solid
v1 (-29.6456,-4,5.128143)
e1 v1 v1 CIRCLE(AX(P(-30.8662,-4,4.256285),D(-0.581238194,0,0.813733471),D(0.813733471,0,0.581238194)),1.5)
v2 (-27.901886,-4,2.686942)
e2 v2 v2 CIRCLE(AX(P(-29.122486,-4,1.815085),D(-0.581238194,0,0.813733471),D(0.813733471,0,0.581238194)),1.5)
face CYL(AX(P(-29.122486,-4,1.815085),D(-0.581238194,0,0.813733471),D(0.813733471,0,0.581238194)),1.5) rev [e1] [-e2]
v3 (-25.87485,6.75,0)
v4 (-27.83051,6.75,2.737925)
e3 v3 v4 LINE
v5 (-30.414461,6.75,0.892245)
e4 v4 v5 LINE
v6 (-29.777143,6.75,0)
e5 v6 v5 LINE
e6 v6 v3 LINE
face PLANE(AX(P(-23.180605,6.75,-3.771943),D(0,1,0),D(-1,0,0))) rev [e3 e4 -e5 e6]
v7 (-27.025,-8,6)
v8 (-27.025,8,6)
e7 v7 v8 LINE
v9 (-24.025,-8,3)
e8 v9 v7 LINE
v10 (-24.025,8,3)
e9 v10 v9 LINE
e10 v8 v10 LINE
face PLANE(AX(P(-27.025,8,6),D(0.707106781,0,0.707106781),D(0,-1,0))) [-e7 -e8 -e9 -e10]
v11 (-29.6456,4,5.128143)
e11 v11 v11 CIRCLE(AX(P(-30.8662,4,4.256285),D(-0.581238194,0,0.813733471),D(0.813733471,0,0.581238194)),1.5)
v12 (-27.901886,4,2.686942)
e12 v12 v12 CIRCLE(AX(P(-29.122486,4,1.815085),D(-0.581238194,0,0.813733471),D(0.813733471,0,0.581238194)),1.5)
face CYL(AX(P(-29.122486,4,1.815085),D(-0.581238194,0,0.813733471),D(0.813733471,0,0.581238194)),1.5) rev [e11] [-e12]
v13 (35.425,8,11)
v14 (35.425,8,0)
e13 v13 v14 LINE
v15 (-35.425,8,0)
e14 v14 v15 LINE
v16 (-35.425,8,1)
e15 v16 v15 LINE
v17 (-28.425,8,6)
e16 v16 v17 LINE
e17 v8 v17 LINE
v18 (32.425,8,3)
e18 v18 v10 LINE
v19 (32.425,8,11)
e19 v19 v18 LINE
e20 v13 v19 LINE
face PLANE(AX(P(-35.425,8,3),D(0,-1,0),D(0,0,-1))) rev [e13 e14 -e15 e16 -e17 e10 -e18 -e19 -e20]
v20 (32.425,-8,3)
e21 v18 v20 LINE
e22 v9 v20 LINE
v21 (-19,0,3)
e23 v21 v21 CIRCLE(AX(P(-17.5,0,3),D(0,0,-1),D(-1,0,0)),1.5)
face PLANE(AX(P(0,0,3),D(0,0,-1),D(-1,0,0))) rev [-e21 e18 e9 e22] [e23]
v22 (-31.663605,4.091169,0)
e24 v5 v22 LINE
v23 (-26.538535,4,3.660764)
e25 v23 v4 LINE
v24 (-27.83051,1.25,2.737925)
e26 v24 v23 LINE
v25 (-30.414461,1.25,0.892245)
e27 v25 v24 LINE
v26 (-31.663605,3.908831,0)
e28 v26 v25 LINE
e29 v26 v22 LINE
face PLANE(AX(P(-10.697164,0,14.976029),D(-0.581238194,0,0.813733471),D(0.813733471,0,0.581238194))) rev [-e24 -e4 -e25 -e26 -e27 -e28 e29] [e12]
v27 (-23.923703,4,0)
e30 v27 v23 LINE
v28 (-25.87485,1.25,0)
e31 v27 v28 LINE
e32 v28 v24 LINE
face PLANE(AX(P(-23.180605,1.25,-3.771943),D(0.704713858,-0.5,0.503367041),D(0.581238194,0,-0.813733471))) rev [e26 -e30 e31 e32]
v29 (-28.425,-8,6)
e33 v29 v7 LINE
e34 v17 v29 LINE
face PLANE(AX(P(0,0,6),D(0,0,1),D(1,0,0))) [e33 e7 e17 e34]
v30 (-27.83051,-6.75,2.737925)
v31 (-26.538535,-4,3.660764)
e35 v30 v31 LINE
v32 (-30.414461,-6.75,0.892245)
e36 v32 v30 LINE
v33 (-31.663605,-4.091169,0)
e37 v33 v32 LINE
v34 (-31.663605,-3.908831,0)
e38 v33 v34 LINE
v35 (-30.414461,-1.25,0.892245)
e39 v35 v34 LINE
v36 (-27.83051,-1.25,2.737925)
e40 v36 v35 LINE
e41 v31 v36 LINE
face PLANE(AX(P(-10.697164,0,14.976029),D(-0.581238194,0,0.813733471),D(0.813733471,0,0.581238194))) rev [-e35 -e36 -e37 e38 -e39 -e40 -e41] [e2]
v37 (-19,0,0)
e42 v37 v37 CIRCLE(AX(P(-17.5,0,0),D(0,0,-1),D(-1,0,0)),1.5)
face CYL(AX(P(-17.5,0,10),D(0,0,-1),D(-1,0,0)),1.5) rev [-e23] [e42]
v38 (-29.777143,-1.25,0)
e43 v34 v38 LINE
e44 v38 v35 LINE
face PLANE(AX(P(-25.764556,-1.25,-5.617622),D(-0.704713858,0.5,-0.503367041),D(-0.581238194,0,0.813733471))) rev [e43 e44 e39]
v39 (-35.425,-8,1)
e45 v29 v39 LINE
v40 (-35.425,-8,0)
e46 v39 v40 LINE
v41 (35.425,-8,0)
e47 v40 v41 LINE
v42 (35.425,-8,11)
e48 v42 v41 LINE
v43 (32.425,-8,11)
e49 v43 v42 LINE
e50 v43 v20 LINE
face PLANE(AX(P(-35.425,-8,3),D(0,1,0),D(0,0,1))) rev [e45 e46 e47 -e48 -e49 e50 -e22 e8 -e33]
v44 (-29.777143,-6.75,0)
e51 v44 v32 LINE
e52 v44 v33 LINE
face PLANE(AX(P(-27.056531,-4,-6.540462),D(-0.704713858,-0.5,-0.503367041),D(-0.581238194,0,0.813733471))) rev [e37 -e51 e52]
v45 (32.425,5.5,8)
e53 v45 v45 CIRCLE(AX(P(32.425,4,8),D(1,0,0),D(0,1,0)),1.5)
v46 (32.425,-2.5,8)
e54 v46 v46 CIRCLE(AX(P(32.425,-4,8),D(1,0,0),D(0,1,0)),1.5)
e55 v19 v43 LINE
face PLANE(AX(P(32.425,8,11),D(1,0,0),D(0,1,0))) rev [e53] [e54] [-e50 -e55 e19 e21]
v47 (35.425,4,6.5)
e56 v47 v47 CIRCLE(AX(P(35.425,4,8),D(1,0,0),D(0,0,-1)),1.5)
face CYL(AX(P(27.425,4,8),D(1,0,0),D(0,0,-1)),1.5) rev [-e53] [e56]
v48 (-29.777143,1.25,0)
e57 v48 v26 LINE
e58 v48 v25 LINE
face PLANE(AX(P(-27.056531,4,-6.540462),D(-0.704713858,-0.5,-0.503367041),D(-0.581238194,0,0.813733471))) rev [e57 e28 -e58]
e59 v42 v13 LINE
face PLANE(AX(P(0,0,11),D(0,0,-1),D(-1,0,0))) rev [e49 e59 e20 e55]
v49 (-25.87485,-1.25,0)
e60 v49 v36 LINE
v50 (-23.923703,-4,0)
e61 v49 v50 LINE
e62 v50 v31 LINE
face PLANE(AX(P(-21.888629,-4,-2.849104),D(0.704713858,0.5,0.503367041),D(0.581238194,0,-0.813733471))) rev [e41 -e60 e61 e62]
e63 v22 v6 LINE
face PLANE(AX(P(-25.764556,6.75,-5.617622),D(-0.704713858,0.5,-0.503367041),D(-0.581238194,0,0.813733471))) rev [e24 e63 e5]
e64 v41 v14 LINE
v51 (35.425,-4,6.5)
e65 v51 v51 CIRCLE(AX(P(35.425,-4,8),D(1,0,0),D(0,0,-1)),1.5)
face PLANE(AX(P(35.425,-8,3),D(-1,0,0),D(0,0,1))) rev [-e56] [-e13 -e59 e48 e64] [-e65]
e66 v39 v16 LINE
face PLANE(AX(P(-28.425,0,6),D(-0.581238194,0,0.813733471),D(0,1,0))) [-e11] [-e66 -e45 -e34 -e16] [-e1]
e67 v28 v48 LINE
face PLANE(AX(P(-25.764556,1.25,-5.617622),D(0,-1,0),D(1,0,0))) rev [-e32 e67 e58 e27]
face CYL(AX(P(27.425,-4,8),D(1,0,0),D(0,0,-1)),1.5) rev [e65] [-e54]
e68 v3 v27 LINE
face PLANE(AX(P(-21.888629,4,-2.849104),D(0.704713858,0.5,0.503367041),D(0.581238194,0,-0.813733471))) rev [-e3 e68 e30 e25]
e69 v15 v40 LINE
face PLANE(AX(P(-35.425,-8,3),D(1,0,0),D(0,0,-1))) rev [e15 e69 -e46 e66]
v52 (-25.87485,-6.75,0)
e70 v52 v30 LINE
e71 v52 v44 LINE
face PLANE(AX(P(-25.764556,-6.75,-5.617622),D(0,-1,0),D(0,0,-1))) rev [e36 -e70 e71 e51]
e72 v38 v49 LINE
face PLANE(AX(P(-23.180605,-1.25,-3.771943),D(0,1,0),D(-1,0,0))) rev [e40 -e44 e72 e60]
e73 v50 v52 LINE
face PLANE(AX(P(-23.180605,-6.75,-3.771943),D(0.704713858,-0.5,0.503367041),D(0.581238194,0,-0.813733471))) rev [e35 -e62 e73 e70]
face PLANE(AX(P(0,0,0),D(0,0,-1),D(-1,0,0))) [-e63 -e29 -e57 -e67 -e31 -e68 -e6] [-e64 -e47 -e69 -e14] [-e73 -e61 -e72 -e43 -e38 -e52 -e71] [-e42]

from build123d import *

# Parameters (mm, degrees)
SKETCH1_W           = 70.85
SKETCH1_H           = 16
BOSS_EXTRUDE1_DEPTH = 3
SKETCH2_W           = 8.4
SKETCH2_H           = 16
BOSS_EXTRUDE2_DEPTH = 3
CHAMFER1_SIZE       = 5
CHAMFER1_SIZE2      = 7
SKETCH3_R           = 1.5
CUT_EXTRUDE1_DEPTH  = 3
CHAMFER2_SIZE       = 3
CUT_EXTRUDE2_START  = -3
CUT_EXTRUDE2_DEPTH  = 8
SKETCH5_W           = 3
SKETCH5_H           = 16
BOSS_EXTRUDE3_DEPTH = 8
SKETCH6_R           = 1.5
CUT_EXTRUDE3_DEPTH  = 8
SKETCH7_R           = 1.5
CUT_EXTRUDE4_DEPTH  = 10


with BuildPart() as part:
    # Sketch1 → Boss-Extrude1 (new body)
    with BuildSketch(Plane.XY):
        Rectangle(SKETCH1_W, SKETCH1_H)
    extrude(amount=BOSS_EXTRUDE1_DEPTH)

    # Sketch2 → Boss-Extrude2 (add)
    with BuildSketch(Plane.XY.offset(3)):
        with Locations((-31.225, 0)):
            Rectangle(SKETCH2_W, SKETCH2_H)
    extrude(amount=BOSS_EXTRUDE2_DEPTH)

    # Chamfer1
    chamfer1_edges = [part.edges().sort_by_distance(p)[0] for p in [
        (-35.425, 0, 6),
    ]]
    chamfer1_side = [part.faces().sort_by_distance(p)[0] for p in [
        (-35.425, 0, 3),
    ]]
    chamfer(chamfer1_edges, length=CHAMFER1_SIZE, length2=CHAMFER1_SIZE2, reference=chamfer1_side[0])

    # Sketch3 → Cut-Extrude1 (cut)
    with BuildSketch(Plane(origin=(-12.440878378, 0, 17.41722973), x_dir=(0.8137334712067354, 0, 0.5812381937190957), z_dir=(-0.5812381937190957, 0, 0.8137334712067354))):
        with Locations((-22.642944757, 4)):
            Circle(SKETCH3_R)
        with Locations((-22.642944757, -4)):
            Circle(SKETCH3_R)
    extrude(amount=-CUT_EXTRUDE1_DEPTH, mode=Mode.SUBTRACT)

    # Chamfer2
    chamfer2_edges = [part.edges().sort_by_distance(p)[0] for p in [
        (-27.025, 0, 3),
    ]]
    chamfer(chamfer2_edges, length=CHAMFER2_SIZE - 0.0001)  # a hair under: the kernel refuses the full size

    # Sketch4 → Cut-Extrude2 (cut)
    with BuildSketch(Plane(origin=(-12.440878378, 0, 17.41722973), x_dir=(0.8137334712067354, 0, 0.5812381937190959), z_dir=(-0.5812381937190958, 0, 0.8137334712067353)).offset(CUT_EXTRUDE2_START)):
        Polygon((-19.467518276, 4), (-21.055231516, 6.75), (-24.230657997, 6.75), (-25.818371237, 4), (-24.230657997, 1.25), (-21.055231516, 1.25), align=None)
        Polygon((-19.467518276, -4), (-21.055231516, -1.25), (-24.230657997, -1.25), (-25.818371237, -4), (-24.230657997, -6.75), (-21.055231516, -6.75), align=None)
    extrude(amount=-CUT_EXTRUDE2_DEPTH, mode=Mode.SUBTRACT)

    # Sketch5 → Boss-Extrude3 (add)
    with BuildSketch(Plane.XY.offset(3)):
        with Locations((33.925, 0)):
            Rectangle(SKETCH5_W, SKETCH5_H)
    extrude(amount=BOSS_EXTRUDE3_DEPTH)

    # Sketch6 → Cut-Extrude3 (cut)
    with BuildSketch(Plane(origin=(35.425, 0, 0), x_dir=(0, 0, -1), z_dir=(1, 0, 0))):
        with Locations((-8, 4)):
            Circle(SKETCH6_R)
        with Locations((-8, -4)):
            Circle(SKETCH6_R)
    extrude(amount=-CUT_EXTRUDE3_DEPTH, mode=Mode.SUBTRACT)

    # Sketch7 → Cut-Extrude4 (cut)
    with BuildSketch(Plane(origin=(0, 0, 0), x_dir=(-1, 0, 0), z_dir=(0, 0, -1))):
        with Locations((17.5, 0)):
            Circle(SKETCH7_R)
    extrude(amount=-CUT_EXTRUDE4_DEPTH, mode=Mode.SUBTRACT)


solid = part.part
